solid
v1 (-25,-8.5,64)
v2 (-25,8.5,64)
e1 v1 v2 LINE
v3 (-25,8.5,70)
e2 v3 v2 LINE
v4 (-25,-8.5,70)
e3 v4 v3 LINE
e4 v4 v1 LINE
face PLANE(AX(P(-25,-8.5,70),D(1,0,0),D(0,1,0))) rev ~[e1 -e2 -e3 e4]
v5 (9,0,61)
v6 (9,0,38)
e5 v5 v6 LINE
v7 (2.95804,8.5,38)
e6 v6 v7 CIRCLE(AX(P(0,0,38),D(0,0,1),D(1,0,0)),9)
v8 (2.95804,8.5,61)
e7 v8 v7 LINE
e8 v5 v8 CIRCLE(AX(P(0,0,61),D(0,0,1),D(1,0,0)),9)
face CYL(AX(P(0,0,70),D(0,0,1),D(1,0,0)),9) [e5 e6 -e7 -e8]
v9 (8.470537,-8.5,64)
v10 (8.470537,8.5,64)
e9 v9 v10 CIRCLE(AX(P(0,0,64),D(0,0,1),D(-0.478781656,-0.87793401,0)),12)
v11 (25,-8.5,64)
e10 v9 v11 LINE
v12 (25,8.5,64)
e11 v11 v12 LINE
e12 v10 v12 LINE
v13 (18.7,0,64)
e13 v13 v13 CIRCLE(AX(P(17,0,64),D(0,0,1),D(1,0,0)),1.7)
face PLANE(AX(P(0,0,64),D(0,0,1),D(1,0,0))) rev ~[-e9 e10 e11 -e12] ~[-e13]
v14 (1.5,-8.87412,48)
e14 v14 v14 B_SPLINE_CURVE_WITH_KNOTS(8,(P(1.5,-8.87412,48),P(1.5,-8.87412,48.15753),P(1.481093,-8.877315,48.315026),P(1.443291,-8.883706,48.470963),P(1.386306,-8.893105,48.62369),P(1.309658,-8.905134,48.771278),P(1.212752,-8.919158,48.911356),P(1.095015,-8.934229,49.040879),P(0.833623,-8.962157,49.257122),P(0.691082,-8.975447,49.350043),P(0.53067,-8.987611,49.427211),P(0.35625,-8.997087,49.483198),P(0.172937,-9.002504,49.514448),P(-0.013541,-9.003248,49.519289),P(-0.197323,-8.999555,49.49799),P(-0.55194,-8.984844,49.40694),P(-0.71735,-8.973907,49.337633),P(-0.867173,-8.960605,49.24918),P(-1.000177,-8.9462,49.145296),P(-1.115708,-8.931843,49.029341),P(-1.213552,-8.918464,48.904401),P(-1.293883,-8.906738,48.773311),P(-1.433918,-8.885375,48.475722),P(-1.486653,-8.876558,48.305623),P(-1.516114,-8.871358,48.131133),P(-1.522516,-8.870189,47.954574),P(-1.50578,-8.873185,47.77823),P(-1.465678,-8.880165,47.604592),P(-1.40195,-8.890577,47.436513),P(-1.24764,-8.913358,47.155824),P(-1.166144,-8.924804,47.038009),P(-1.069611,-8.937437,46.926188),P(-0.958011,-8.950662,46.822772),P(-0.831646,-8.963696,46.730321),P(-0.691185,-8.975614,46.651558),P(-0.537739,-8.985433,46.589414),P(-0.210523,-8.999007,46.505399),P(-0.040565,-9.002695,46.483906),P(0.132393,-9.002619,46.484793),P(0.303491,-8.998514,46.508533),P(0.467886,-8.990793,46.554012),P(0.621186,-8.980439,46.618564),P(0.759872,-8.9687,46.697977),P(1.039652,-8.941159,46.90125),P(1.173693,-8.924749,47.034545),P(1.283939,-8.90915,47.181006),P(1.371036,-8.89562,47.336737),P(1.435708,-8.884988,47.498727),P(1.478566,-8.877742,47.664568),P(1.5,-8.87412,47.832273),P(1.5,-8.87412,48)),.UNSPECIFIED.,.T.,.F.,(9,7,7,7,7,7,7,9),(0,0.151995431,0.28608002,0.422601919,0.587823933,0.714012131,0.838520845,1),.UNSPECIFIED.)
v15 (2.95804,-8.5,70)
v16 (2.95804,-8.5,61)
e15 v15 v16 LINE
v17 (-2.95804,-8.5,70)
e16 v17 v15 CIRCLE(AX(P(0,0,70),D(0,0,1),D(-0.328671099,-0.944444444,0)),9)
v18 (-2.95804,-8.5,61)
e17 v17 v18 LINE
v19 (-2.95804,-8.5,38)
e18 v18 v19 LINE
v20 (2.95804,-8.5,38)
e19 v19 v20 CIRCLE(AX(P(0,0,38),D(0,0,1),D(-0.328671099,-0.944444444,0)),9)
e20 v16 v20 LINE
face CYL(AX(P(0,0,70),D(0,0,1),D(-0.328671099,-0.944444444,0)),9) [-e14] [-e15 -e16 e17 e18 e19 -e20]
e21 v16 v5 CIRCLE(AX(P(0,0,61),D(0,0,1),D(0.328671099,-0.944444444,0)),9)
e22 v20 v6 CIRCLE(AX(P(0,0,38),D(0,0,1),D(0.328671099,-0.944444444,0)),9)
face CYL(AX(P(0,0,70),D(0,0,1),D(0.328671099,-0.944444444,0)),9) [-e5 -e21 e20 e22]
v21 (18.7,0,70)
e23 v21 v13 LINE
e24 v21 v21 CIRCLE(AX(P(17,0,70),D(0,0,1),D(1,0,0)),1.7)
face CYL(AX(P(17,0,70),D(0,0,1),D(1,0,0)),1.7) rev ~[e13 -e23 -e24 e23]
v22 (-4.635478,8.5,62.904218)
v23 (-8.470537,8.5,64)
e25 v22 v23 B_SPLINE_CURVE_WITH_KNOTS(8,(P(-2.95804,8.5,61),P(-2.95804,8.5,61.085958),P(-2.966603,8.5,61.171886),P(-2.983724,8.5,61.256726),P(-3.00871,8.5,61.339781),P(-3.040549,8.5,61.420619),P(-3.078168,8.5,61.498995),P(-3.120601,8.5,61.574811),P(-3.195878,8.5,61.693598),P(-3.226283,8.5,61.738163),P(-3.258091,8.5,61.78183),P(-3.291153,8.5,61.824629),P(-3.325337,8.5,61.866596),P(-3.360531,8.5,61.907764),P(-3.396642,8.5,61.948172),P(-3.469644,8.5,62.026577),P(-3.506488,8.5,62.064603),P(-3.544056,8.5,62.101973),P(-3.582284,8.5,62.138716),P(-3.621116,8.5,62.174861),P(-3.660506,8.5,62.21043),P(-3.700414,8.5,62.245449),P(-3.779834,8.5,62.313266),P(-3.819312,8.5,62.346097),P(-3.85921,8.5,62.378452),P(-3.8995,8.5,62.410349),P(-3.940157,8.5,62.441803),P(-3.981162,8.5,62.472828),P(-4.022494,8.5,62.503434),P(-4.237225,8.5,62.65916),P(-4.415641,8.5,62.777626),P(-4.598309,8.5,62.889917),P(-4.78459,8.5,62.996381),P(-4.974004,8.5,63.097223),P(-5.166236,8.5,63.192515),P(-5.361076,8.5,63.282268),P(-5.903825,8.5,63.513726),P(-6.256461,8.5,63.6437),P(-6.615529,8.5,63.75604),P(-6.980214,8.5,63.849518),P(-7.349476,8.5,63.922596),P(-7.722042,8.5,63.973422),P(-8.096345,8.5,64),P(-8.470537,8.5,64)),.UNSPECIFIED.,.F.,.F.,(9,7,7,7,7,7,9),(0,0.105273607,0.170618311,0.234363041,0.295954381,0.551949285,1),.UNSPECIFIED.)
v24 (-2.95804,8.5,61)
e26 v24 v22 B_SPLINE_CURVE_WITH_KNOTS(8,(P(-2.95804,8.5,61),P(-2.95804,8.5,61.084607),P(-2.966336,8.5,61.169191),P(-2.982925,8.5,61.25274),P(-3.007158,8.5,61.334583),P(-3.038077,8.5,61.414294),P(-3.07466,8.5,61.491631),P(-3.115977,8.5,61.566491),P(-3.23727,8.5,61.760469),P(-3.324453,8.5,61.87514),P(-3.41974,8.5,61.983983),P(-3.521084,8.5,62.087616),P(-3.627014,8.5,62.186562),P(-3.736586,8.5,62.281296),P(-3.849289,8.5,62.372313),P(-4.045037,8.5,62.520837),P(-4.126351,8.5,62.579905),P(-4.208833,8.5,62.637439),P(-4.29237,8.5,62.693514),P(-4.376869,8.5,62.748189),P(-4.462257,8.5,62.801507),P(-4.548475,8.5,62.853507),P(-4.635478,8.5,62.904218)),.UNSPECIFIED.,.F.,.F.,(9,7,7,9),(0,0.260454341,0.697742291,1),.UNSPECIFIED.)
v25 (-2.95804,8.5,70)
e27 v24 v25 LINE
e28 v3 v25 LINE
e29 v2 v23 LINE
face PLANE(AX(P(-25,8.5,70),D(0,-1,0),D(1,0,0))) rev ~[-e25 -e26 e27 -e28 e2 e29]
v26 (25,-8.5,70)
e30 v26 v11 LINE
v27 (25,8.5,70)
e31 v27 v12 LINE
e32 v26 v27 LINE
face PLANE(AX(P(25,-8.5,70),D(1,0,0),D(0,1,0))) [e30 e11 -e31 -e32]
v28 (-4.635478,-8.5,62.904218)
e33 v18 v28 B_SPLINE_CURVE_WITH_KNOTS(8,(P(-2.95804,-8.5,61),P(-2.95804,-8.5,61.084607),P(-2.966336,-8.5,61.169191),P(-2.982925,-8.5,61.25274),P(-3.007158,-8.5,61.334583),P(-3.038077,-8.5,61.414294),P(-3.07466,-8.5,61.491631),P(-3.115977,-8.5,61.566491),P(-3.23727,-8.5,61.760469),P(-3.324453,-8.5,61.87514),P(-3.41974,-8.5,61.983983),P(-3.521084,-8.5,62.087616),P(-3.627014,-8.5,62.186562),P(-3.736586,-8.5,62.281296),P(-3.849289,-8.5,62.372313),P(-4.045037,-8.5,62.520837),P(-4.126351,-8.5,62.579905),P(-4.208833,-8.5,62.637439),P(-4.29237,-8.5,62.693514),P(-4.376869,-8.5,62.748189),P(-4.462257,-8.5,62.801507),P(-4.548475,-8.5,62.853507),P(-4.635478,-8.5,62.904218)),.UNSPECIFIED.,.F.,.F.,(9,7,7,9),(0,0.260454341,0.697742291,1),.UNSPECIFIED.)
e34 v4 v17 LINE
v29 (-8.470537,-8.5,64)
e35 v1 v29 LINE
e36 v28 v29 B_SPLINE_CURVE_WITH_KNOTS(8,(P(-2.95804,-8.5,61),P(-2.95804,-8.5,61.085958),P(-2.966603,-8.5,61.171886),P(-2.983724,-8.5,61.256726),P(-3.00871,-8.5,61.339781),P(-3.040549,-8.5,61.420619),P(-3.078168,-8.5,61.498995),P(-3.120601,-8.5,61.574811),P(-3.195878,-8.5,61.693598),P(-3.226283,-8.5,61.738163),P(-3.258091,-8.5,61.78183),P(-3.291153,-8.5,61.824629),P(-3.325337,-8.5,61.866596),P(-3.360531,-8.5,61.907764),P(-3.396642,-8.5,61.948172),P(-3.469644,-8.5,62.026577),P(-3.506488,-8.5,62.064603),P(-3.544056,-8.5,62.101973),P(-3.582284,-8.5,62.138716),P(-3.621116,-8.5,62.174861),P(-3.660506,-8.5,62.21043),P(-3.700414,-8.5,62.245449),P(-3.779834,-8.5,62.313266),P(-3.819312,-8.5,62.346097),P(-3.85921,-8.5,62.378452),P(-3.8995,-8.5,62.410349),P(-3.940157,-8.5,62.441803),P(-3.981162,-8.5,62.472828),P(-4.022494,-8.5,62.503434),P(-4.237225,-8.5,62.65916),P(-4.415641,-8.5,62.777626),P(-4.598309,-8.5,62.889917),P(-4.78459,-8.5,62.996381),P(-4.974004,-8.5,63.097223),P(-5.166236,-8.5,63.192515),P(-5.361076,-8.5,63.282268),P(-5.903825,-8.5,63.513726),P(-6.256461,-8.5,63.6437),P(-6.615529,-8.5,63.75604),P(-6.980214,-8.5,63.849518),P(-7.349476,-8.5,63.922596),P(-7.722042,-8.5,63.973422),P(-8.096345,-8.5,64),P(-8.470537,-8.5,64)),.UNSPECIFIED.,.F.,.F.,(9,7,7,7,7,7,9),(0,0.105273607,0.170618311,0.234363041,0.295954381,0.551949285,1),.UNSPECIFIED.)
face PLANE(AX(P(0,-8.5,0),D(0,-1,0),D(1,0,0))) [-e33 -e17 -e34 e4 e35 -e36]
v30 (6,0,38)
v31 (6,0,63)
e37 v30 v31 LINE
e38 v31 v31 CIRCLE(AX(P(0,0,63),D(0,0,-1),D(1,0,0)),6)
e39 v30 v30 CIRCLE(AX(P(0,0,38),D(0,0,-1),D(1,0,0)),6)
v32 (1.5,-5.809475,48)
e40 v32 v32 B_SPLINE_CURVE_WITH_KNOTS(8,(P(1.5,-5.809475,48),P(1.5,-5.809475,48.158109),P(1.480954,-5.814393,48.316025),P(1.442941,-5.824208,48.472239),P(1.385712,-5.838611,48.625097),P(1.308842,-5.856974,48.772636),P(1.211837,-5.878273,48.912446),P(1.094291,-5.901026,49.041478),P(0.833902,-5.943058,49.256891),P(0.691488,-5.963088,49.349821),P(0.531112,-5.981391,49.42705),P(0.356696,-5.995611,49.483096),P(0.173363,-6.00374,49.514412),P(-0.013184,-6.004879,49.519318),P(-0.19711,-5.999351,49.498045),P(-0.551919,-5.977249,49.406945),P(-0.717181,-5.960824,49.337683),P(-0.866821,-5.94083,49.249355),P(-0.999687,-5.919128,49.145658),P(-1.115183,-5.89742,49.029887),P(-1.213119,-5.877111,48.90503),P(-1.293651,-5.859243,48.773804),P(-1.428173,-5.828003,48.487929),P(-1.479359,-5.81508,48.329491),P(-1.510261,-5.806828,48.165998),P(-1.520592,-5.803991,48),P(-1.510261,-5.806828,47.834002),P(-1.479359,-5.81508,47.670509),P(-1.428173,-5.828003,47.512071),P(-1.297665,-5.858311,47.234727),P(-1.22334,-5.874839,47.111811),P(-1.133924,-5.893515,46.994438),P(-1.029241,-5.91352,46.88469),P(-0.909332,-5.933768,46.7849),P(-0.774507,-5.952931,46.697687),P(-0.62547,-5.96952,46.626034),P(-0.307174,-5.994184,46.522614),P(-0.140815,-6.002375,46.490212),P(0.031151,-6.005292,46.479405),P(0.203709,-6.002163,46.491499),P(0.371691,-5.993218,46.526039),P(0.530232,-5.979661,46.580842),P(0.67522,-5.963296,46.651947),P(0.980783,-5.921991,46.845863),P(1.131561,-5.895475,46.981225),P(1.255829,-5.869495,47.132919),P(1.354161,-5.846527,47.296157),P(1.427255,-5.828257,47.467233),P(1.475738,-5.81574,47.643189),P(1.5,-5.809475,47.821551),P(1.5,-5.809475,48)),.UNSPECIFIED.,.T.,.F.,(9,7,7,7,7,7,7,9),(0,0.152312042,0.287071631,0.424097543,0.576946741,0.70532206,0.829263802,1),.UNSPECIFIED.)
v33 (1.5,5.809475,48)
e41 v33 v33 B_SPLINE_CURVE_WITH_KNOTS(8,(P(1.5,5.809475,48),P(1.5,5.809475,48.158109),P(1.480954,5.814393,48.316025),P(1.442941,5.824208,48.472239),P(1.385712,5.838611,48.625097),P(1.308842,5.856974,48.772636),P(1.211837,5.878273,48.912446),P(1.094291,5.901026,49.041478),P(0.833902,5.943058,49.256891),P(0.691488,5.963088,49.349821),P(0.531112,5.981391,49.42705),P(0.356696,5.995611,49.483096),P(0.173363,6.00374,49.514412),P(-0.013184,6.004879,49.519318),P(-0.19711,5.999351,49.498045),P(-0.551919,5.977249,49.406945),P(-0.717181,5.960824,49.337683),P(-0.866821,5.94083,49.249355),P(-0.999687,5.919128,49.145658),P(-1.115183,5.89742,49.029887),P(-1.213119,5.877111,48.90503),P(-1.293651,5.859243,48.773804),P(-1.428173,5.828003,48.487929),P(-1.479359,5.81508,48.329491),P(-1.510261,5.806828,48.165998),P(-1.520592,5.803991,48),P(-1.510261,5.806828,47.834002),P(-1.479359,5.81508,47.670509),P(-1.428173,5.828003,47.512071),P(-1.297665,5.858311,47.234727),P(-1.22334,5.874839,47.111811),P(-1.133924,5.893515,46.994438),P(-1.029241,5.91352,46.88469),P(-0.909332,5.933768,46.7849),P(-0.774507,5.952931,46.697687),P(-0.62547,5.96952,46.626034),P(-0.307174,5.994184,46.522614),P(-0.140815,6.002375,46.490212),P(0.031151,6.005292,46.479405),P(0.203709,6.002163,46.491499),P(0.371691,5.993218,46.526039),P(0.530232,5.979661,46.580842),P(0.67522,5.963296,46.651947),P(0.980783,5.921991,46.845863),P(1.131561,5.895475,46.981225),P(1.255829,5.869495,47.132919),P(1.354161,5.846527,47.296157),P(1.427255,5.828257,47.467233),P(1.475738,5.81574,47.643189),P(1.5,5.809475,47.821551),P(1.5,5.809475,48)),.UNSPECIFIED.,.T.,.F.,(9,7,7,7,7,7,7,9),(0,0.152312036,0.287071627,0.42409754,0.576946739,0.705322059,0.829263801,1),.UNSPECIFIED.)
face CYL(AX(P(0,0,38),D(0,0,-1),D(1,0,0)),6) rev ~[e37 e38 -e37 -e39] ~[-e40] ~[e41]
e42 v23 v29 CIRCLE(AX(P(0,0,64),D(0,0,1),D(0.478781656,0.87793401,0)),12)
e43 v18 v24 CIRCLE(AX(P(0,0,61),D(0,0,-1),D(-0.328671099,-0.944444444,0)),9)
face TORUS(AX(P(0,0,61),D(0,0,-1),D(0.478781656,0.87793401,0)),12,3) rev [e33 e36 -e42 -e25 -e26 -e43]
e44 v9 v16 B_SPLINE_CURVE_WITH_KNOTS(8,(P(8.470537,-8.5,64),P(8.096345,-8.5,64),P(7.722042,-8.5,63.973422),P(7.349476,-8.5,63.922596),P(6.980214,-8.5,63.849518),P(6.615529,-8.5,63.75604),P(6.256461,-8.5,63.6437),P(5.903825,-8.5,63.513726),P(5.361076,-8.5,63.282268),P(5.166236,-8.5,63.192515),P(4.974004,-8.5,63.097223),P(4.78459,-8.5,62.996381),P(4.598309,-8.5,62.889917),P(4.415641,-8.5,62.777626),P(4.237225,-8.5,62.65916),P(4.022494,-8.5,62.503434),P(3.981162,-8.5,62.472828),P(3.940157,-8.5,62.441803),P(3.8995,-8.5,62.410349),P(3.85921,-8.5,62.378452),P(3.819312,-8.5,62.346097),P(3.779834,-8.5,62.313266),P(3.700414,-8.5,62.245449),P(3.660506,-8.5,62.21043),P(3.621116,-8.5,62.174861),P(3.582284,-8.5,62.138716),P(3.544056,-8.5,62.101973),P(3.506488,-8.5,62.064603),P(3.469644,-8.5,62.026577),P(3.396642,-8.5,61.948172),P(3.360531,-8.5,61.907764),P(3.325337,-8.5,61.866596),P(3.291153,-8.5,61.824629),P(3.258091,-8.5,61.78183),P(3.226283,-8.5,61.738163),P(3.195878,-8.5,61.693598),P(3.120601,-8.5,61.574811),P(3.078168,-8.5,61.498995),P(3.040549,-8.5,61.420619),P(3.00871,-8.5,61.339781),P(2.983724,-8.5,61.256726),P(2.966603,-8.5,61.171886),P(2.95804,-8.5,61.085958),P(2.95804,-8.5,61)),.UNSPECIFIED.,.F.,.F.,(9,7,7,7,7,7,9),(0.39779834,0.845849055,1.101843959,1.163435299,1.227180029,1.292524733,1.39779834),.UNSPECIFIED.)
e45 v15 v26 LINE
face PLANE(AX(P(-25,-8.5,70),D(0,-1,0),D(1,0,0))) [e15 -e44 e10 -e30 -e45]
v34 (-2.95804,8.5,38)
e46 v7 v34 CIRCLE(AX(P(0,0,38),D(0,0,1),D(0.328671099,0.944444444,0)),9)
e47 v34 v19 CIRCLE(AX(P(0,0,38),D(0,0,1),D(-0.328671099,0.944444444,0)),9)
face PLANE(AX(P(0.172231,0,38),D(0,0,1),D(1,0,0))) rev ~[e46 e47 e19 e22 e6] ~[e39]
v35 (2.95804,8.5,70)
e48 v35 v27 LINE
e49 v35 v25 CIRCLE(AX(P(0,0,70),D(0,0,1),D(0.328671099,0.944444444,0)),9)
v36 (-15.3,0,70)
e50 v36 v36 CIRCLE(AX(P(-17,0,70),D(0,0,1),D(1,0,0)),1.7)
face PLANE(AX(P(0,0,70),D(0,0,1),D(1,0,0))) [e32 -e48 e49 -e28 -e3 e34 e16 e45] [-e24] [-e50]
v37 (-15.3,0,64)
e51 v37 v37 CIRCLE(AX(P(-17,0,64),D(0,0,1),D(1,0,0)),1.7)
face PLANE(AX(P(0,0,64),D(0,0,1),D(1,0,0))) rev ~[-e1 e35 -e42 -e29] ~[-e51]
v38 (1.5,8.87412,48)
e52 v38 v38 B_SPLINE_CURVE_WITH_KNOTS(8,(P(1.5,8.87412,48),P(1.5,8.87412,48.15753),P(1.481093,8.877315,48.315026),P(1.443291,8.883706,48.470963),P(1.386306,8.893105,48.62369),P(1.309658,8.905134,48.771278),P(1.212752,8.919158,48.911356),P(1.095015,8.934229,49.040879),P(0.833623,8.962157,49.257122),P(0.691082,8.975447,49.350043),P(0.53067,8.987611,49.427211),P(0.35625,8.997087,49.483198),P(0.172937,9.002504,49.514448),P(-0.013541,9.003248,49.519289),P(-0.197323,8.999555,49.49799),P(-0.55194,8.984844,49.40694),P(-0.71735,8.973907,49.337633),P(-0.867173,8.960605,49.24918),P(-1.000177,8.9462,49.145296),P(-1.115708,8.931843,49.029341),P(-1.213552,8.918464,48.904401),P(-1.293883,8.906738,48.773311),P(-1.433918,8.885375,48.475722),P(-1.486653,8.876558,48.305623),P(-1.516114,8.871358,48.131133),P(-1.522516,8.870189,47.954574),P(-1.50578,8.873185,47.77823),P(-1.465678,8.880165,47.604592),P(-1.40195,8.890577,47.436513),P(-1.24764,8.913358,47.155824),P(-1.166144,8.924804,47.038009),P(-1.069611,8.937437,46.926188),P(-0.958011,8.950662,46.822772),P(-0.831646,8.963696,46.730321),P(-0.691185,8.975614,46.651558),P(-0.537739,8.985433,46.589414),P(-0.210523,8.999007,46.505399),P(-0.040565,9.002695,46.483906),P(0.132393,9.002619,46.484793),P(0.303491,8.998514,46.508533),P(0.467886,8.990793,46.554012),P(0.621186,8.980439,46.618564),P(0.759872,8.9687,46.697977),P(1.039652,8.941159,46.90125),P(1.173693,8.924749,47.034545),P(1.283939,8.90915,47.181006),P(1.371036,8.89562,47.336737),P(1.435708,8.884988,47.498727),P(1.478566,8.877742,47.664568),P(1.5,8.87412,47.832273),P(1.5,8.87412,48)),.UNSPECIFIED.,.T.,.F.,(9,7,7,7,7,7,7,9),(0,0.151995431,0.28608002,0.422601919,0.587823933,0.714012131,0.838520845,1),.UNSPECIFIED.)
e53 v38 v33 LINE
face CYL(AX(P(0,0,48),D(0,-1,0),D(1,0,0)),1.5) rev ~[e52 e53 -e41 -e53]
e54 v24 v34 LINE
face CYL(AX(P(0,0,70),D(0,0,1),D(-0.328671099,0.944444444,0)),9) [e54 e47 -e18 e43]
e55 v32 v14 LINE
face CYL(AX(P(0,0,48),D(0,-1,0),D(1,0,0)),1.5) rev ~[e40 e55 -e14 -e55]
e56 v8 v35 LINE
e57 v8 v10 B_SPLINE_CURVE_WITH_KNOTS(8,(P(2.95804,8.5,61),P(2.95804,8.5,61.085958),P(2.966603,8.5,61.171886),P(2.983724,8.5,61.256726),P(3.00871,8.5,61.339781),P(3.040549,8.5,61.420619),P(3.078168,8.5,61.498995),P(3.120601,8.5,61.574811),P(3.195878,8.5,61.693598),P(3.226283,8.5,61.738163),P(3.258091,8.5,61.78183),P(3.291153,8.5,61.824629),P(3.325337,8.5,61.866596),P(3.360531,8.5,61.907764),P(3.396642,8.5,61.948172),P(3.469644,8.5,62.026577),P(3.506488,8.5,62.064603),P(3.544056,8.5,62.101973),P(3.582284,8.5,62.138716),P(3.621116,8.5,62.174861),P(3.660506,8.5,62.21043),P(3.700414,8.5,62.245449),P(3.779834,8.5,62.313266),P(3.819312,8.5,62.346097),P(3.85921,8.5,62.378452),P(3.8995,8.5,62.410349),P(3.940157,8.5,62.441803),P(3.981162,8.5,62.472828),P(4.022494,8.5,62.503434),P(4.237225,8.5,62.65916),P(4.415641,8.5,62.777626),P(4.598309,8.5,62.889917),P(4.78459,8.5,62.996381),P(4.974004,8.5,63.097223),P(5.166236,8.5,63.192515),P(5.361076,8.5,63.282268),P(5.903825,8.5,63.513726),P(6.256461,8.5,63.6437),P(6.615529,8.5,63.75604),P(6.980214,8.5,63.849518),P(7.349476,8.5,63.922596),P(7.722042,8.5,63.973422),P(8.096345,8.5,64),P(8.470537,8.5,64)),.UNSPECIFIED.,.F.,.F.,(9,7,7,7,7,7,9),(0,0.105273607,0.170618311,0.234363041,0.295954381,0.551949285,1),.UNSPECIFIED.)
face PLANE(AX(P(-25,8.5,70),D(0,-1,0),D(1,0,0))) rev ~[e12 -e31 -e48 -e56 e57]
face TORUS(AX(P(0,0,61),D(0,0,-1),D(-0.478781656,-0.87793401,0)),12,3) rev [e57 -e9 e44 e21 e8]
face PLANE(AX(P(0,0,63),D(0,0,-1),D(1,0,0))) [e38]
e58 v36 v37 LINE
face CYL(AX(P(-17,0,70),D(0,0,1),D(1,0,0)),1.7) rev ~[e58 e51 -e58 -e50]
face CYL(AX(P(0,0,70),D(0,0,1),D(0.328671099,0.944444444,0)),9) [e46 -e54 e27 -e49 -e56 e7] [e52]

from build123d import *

# Parameters (mm, degrees)
F1_W         = 50
F1_H         = 17
F1_R         = 1.7
F2_DEPTH     = 6
F4_DEPTH     = 32
F5_T4_ANGLE  = 237.2117204573
F5_T10_ANGLE = 237.2117204573
F6_R         = 6
F7_DEPTH     = 25
F8_R         = 1.5
F9_DEPTH     = 15.2


# Not quite as in the source:
# - a fillet or chamfer that OpenCascade refuses, or shapes differently, is made with other operations: its cross-section is extruded or revolved along the edge and cut away or added


with BuildPart() as f2:
    # F1 (on offset) → F2 (new body)
    with BuildSketch(Plane.XY.offset(70)):
        Rectangle(F1_W, F1_H)
        with Locations((-17, 0)):
            Circle(F1_R, mode=Mode.SUBTRACT)
        with Locations((17, 0)):
            Circle(F1_R, mode=Mode.SUBTRACT)
    extrude(amount=-F2_DEPTH)

    # F3 (on face) → F4 (join)
    with BuildSketch(Plane.XY.offset(70)):
        with BuildLine():
            ThreePointArc((2.9580398915, -8.5), (7.3356103708, -5.2142900272), (9, 0))
            ThreePointArc((9, 0), (7.3356103708, 5.2142900272), (2.9580398915, 8.5))
            Line((2.9580398915, 8.5), (-2.9580398916, 8.5))
            ThreePointArc((-2.9580398916, 8.5), (-9, 0), (-2.9580398916, -8.5))
            Line((-2.9580398916, -8.5), (2.9580398915, -8.5))
        make_face()
        with BuildLine():
            ThreePointArc((-2.9580398916, -8.5), (0, -9), (2.9580398915, -8.5))
            Line((2.9580398915, -8.5), (-2.9580398916, -8.5))
        make_face()
        with BuildLine():
            Line((-2.9580398916, 8.5), (2.9580398915, 8.5))
            ThreePointArc((2.9580398915, 8.5), (0, 9), (-2.9580398916, 8.5))
        make_face()
    extrude(amount=-F4_DEPTH)

    # F5: fillet of radius 3 on 2 edges, made by hand


with BuildPart() as f5_tool2:
    # F5_s3 → F5_t4 (revolve)
    with BuildSketch(Plane(origin=(0, 0, 0), x_dir=(0, 0, 1), z_dir=(-0.8779340101, 0.4787816558, 0))):
        with BuildLine():
            ThreePointArc((61, -9), (63.1213203436, -9.8786796564), (64, -12))
            Line((64, -12), (64, -9))
            Line((64, -9), (61, -9))
        make_face()
    revolve(axis=Axis((0, 0, 64), (0, 0, 1)), revolution_arc=F5_T4_ANGLE)

    split(bisect_by=Plane.XZ.offset(-8.5), keep=Keep.TOP)

    split(bisect_by=Plane.XZ.offset(8.5), keep=Keep.BOTTOM)


with BuildPart() as f2_1:
    add(f2.part)

    # F5_t1: union F5_tool2
    add(f5_tool2.part)


with BuildPart() as f5_tool8:
    # F5_s9 → F5_t10 (revolve)
    with BuildSketch(Plane(origin=(0, 0, 0), x_dir=(0, 0, 1), z_dir=(0.8779340101, -0.4787816558, 0))):
        with BuildLine():
            ThreePointArc((61, -9), (63.1213203436, -9.8786796564), (64, -12))
            Line((64, -12), (64, -9))
            Line((64, -9), (61, -9))
        make_face()
    revolve(axis=Axis((0, 0, 64), (0, 0, 1)), revolution_arc=F5_T10_ANGLE)

    split(bisect_by=Plane.XZ.offset(-8.5), keep=Keep.TOP)

    split(bisect_by=Plane.XZ.offset(8.5), keep=Keep.BOTTOM)


with BuildPart() as f2_2:
    add(f2_1.part)

    # F5_t7: union F5_tool8
    add(f5_tool8.part)

    # F6 (on face) → F7 (cut)
    with BuildSketch(Plane(origin=(0, 0, 38), x_dir=(1, 0, 0), z_dir=(0, 0, -1))):
        Circle(F6_R)
    extrude(amount=-F7_DEPTH, mode=Mode.SUBTRACT)

    # F8 (on Front) → F9 (cut, symmetric)
    with BuildSketch(Plane.XZ):
        with Locations((0, 48)):
            Circle(F8_R)
    extrude(amount=F9_DEPTH, both=True, mode=Mode.SUBTRACT)


solid = f2_2.part
